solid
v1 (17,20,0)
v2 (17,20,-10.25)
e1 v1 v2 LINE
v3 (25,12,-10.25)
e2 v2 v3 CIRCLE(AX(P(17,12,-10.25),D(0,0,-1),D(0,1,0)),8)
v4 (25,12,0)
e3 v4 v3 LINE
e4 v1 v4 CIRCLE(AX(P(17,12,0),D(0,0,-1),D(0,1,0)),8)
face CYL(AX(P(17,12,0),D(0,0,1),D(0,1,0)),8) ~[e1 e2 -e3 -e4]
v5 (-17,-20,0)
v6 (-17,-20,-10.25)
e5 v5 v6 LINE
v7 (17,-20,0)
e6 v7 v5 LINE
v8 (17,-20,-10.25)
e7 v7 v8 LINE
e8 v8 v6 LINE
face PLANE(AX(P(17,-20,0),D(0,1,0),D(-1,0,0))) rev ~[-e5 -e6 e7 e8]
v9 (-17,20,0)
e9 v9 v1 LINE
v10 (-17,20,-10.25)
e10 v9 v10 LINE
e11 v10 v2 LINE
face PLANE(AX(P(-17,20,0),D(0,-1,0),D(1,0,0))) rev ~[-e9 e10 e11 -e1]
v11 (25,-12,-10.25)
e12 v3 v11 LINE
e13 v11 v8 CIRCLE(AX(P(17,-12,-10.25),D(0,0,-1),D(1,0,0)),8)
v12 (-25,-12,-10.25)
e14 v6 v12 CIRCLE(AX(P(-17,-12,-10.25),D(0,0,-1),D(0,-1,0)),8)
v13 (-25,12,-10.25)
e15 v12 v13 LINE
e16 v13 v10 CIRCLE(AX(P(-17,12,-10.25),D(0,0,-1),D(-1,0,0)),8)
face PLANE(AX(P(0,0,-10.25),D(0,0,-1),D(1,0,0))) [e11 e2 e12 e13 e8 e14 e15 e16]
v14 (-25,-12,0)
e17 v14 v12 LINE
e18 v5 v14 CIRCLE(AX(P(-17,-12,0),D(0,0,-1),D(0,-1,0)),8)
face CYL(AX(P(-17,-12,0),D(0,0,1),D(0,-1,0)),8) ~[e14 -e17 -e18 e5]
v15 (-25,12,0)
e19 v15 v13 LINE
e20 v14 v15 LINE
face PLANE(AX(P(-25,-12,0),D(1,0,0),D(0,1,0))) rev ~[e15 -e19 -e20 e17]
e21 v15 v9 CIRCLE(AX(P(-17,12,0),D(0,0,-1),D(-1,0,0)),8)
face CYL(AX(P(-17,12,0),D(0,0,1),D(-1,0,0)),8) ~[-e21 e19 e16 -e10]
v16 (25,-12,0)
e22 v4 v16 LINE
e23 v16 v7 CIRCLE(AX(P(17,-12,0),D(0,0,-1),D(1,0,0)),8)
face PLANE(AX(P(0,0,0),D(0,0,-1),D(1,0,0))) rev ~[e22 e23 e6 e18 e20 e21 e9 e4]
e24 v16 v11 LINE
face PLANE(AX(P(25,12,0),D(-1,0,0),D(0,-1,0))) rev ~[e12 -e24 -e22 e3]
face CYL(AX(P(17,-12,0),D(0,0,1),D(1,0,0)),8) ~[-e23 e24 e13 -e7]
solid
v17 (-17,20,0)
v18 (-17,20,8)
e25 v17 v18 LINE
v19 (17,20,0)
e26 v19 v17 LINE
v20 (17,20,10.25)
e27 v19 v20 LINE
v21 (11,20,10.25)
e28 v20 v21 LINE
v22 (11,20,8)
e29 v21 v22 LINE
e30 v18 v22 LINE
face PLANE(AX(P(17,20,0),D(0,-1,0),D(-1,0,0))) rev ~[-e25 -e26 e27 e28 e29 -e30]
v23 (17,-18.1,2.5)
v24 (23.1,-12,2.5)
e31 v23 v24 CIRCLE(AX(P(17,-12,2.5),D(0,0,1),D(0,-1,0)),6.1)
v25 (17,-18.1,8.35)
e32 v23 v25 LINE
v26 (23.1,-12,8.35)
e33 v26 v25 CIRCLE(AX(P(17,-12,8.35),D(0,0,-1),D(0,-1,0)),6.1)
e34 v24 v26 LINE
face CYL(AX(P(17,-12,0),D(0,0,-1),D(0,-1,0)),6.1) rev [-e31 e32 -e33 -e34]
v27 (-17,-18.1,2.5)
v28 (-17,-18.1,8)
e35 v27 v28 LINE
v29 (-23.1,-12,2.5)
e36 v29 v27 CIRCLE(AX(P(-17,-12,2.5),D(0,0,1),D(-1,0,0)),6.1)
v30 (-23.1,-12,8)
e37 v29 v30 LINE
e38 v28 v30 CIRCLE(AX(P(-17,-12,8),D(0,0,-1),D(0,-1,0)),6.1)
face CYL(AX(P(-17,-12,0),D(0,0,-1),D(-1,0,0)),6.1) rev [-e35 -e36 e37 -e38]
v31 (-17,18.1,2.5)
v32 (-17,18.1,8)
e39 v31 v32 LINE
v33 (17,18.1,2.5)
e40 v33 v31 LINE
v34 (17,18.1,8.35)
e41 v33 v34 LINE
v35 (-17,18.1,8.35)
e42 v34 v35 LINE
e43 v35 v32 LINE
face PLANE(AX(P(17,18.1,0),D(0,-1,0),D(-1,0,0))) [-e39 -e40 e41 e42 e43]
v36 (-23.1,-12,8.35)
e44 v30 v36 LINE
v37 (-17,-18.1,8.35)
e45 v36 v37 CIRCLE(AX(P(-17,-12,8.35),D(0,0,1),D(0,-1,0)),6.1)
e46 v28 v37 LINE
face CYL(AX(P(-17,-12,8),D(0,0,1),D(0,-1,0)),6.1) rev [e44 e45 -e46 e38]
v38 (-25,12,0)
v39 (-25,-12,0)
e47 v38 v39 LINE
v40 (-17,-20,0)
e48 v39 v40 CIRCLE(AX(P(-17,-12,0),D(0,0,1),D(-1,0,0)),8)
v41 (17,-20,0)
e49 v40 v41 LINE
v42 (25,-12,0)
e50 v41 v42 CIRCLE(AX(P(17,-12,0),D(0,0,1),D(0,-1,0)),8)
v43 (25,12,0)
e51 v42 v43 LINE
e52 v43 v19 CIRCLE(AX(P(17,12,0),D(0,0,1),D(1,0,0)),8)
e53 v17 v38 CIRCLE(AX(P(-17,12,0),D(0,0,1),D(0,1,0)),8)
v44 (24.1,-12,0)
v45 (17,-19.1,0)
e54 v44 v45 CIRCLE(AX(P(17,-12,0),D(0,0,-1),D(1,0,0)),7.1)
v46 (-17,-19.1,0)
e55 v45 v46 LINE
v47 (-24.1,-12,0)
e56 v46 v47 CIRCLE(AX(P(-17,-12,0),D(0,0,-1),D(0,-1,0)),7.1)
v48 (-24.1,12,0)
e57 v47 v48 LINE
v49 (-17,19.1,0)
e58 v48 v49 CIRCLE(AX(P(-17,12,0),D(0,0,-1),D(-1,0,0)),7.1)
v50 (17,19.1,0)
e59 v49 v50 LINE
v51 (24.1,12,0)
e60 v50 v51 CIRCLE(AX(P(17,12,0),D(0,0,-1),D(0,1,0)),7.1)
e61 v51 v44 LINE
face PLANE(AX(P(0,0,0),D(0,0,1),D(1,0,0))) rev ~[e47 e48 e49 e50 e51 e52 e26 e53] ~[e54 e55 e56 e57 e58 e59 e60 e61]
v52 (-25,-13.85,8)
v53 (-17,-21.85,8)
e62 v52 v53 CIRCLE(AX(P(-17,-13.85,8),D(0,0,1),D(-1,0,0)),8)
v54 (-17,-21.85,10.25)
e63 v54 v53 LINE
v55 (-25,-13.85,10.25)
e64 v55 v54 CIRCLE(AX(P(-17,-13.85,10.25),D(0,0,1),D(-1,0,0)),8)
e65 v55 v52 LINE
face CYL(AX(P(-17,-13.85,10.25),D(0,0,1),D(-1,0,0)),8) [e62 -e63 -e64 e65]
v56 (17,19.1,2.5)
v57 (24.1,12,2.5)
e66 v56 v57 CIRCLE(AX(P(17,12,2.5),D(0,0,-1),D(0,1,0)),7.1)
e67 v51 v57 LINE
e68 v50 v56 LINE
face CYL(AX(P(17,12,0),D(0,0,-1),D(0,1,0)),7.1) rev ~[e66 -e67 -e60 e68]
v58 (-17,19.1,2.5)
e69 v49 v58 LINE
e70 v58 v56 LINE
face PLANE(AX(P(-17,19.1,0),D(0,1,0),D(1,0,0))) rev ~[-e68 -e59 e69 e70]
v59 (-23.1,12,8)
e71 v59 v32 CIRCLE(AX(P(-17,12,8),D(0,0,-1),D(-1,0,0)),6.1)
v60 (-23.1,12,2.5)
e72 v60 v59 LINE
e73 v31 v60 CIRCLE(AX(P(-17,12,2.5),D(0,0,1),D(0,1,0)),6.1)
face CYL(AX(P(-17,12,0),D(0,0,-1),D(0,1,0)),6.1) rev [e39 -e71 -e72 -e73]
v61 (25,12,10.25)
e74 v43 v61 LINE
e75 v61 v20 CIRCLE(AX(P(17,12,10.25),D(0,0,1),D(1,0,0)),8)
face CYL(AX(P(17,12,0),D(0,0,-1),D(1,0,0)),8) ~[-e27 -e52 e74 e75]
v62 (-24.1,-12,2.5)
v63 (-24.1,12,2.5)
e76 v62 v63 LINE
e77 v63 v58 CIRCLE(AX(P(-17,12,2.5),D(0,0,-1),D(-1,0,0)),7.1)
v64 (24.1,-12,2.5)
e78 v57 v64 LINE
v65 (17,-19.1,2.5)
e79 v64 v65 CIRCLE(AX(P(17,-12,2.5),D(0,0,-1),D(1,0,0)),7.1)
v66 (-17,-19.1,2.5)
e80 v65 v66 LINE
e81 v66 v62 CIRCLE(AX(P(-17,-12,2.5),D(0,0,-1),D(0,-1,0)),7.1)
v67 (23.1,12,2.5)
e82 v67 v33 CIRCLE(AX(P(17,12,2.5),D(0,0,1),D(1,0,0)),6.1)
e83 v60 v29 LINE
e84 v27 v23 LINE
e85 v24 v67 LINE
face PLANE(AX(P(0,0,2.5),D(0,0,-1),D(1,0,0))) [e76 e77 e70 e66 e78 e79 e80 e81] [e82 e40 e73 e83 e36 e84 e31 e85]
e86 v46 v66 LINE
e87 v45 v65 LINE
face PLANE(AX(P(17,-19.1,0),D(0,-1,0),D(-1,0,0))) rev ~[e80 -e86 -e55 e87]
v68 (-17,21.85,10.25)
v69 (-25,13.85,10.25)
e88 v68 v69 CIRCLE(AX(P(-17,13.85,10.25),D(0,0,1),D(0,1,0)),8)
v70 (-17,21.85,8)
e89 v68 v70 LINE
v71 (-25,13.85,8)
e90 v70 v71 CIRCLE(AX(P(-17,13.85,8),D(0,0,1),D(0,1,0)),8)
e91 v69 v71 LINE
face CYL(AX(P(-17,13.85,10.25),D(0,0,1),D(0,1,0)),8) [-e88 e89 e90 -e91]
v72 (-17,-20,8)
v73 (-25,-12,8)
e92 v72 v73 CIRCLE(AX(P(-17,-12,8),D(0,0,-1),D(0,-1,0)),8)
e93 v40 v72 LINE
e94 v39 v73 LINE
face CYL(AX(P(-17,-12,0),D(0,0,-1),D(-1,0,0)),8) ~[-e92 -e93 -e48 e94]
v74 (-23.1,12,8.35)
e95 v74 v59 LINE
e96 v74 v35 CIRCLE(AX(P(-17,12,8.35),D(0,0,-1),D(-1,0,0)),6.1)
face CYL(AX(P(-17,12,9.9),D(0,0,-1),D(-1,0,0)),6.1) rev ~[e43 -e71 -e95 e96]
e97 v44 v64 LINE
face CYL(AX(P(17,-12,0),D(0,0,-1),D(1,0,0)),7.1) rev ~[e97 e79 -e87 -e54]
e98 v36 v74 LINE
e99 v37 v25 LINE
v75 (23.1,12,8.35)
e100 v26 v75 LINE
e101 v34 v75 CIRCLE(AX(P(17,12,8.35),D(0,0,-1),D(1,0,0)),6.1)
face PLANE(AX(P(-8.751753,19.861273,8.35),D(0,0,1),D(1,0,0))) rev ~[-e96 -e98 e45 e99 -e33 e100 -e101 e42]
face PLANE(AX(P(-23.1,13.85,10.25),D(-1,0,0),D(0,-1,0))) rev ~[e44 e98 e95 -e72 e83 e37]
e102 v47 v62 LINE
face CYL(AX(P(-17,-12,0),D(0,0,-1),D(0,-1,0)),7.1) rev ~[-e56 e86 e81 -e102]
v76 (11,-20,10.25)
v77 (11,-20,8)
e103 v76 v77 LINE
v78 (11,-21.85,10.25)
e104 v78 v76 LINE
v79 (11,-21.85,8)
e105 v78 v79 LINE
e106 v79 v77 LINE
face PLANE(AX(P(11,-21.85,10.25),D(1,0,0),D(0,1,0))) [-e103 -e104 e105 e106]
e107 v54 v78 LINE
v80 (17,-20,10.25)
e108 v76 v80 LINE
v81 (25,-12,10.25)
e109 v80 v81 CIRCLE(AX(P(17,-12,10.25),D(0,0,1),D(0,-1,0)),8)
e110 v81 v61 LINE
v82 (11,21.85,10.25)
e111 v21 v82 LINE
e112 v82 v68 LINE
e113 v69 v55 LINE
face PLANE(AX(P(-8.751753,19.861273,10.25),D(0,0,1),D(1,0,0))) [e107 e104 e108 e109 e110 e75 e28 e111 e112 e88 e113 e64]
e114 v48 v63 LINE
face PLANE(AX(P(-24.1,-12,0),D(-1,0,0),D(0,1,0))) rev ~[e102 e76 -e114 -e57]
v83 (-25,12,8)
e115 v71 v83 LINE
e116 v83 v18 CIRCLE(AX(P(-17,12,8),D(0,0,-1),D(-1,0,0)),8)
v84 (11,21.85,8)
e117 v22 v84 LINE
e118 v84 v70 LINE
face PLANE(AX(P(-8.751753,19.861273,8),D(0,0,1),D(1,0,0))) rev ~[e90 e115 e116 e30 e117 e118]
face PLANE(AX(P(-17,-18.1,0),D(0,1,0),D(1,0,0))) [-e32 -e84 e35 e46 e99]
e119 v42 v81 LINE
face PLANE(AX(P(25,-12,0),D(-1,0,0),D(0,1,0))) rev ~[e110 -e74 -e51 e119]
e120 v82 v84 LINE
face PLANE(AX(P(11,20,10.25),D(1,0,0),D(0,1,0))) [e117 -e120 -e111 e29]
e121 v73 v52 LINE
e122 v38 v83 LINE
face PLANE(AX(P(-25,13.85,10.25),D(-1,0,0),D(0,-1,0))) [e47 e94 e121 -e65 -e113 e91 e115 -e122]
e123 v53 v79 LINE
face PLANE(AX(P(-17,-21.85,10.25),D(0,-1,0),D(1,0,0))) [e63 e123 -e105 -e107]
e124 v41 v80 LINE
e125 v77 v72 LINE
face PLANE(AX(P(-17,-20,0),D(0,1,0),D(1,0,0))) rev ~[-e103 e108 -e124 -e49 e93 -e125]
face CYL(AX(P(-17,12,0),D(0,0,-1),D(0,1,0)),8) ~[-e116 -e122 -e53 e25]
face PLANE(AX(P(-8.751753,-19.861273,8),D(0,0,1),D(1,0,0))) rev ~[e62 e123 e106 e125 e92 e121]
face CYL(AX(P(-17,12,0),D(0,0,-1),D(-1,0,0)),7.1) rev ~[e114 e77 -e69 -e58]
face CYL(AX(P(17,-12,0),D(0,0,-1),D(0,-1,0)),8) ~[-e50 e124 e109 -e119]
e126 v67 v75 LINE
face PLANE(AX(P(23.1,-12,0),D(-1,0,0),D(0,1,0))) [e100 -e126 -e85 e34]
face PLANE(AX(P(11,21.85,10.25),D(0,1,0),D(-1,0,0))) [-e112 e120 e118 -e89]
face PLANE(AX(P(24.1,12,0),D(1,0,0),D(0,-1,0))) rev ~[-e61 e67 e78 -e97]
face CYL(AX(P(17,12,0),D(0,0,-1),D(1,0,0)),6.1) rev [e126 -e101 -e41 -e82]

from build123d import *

# Parameters (mm, degrees)
F1_DEPTH     = 10.25
F3_DEPTH     = 2.25
F5_DEPTH     = 10.25
F6_T         = 1.9
F6_T3_DEPTH  = 31.8
F6_T5_DEPTH  = 6.05
F6_T8_ANGLE  = 90.000000001
F6_T10_ANGLE = 90.000000001
F8_DEPTH     = 2.5


# Not quite as in the source:
# - a shell that OpenCascade refuses in one call is made with other operations: the cavity is built on its own and cut out


with BuildPart() as f1:
    # F0 (on Top) → F1 (new body)
    with BuildSketch(Plane.XY):
        with BuildLine():
            Line((17, 20), (-17, 20))
            ThreePointArc((-17, 20), (-22.6568542495, 17.6568542495), (-25, 12))
            Line((-25, 12), (-25, -12))
            ThreePointArc((-25, -12), (-22.6568542495, -17.6568542495), (-17, -20))
            Line((-17, -20), (17, -20))
            ThreePointArc((17, -20), (22.6568542495, -17.6568542495), (25, -12))
            Line((25, -12), (25, 12))
            ThreePointArc((25, 12), (22.6568542495, 17.6568542495), (17, 20))
        make_face()
    extrude(amount=F1_DEPTH)

    # F2 (on face) → F3 (join)
    with BuildSketch(Plane.XY.offset(10.25)):
        with BuildLine():
            Line((11, 21.85), (-17, 21.85))
            ThreePointArc((-17, 21.85), (-22.6568542495, 19.5068542495), (-25, 13.85))
            Line((-25, 13.85), (-25, 12))
            ThreePointArc((-25, 12), (-22.6568542495, 17.6568542495), (-17, 20))
            Line((-17, 20), (11, 20))
            Line((11, 20), (11, 21.85))
        make_face()
        with BuildLine():
            Line((11, -21.85), (11, -20))
            Line((11, -20), (-17, -20))
            ThreePointArc((-17, -20), (-22.6568542495, -17.6568542495), (-25, -12))
            Line((-25, -12), (-25, -13.85))
            ThreePointArc((-25, -13.85), (-22.6568542495, -19.5068542495), (-17, -21.85))
            Line((-17, -21.85), (11, -21.85))
        make_face()
    extrude(amount=-F3_DEPTH)

    # F6: shell of thickness 1.9, made by hand


with BuildPart() as f5:
    # F4 (on face) → F5 (new body)
    with BuildSketch(Plane(origin=(0, 0, 0), x_dir=(1, 0, 0), z_dir=(0, 0, -1))):
        with BuildLine():
            Line((17, 20), (-17, 20))
            ThreePointArc((-17, 20), (-22.6568542495, 17.6568542495), (-25, 12))
            Line((-25, 12), (-25, -12))
            ThreePointArc((-25, -12), (-22.6568542495, -17.6568542495), (-17, -20))
            Line((-17, -20), (17, -20))
            ThreePointArc((17, -20), (22.6568542495, -17.6568542495), (25, -12))
            Line((25, -12), (25, 12))
            ThreePointArc((25, 12), (22.6568542495, 17.6568542495), (17, 20))
        make_face()
    extrude(amount=F5_DEPTH)


with BuildPart() as f6_core1:
    # F6_t2: copy of F1
    add(f1.part)

    # the walls: a layer under each face that stays
    f6_faces = [f6_core1.faces().sort_by_distance(p)[0] for p in [
        (0, 20, 5.125),
        (22.6568542495, 17.6568542495, 5.125),
        (25, 0, 5.125),
        (22.6568542495, -17.6568542495, 5.125),
        (0, -20, 5.125),
        (-22.6568542495, -17.6568542495, 4),
        (-25, 0, 5.125),
        (-22.6568542495, -19.5068542495, 9.125),
        (-3, -21.85, 9.125),
        (-22.6568542495, 19.5068542495, 9.125),
        (-3, 21.85, 9.125),
        (-19, -20.2083333333, 8),
        (11, -20.925, 9.125),
        (0, 0, 10.25),
        (11, 20.925, 9.125),
        (-19, 20.2083333333, 8),
        (-22.6568542495, 17.6568542495, 4),
    ]]
    thicken(f6_faces, amount=-F6_T, mode=Mode.SUBTRACT)

    # F6_s4 → F6_t3 (cut)
    with BuildSketch(Plane.YZ.offset(-18.9)):
        Polygon((20.019, 7.981), (18.1, 8), (18.1, 9.9), (20, 9.9), align=None)
        Polygon((-20.019, 7.981), (-18.1, 8), (-18.1, 9.9), (-20, 9.9), align=None)
    extrude(amount=F6_T3_DEPTH, mode=Mode.SUBTRACT)

    # F6_s6 → F6_t5 (cut)
    with BuildSketch(Plane.XY.offset(6.1)):
        Polygon((11.019, 20.019), (11, 18.1), (9.1, 18.1), (9.1, 20), align=None)
        Polygon((11.019, -20.019), (11, -18.1), (9.1, -18.1), (9.1, -20), align=None)
    extrude(amount=F6_T5_DEPTH, mode=Mode.SUBTRACT)

    # F6_s7 → F6_t8 (revolve, cut)
    with BuildSketch(Plane.YZ.offset(-17)):
        Polygon((-20.019, 7.981), (-18.1, 8), (-18.1, 9.9), (-20, 9.9), align=None)
    revolve(axis=Axis((-17, -12, 8), (0, 0, -1)), revolution_arc=F6_T8_ANGLE, mode=Mode.SUBTRACT)

    # F6_s9 → F6_t10 (revolve, cut)
    with BuildSketch(Plane.XZ.offset(-12)):
        Polygon((-25.019, 7.981), (-25, 9.9), (-23.1, 9.9), (-23.1, 8), align=None)
    revolve(axis=Axis((-17, 12, 8), (0, 0, -1)), revolution_arc=F6_T10_ANGLE, mode=Mode.SUBTRACT)


with BuildPart() as f1_1:
    add(f1.part)

    # what is left inside the walls is the cavity
    f6_cavity = [f6_core1.part.solids().sort_by_distance(p)[0] for p in [
        (0, -6.033333, 8.331),
    ]]
    add(f6_cavity, mode=Mode.SUBTRACT)

    # F7 (on face) → F8 (cut)
    with BuildSketch(Plane(origin=(0, 0, 0), x_dir=(1, 0, 0), z_dir=(0, 0, -1))):
        with BuildLine():
            ThreePointArc((-17, 19.1), (-22.0204581464, 17.0204581464), (-24.1, 12))
            Line((-24.1, 12), (-24.1, -12))
            ThreePointArc((-24.1, -12), (-22.0204581464, -17.0204581464), (-17, -19.1))
            Line((-17, -19.1), (17, -19.1))
            ThreePointArc((17, -19.1), (22.0204581464, -17.0204581464), (24.1, -12))
            Line((24.1, -12), (24.1, 12))
            ThreePointArc((24.1, 12), (22.0204581464, 17.0204581464), (17, 19.1))
            Line((17, 19.1), (-17, 19.1))
        make_face()
        with BuildLine():
            Line((-23.1, -12), (-23.1, 12))
            ThreePointArc((-23.1, 12), (-21.3133513652, 16.3133513652), (-17, 18.1))
            Line((-17, 18.1), (17, 18.1))
            ThreePointArc((17, 18.1), (21.3133513652, 16.3133513652), (23.1, 12))
            Line((23.1, 12), (23.1, -12))
            ThreePointArc((23.1, -12), (21.3133513652, -16.3133513652), (17, -18.1))
            Line((17, -18.1), (-17, -18.1))
            ThreePointArc((-17, -18.1), (-21.3133513652, -16.3133513652), (-23.1, -12))
        make_face(mode=Mode.SUBTRACT)
    extrude(amount=-F8_DEPTH, mode=Mode.SUBTRACT)


solid = Compound([f5.part, f1_1.part])
